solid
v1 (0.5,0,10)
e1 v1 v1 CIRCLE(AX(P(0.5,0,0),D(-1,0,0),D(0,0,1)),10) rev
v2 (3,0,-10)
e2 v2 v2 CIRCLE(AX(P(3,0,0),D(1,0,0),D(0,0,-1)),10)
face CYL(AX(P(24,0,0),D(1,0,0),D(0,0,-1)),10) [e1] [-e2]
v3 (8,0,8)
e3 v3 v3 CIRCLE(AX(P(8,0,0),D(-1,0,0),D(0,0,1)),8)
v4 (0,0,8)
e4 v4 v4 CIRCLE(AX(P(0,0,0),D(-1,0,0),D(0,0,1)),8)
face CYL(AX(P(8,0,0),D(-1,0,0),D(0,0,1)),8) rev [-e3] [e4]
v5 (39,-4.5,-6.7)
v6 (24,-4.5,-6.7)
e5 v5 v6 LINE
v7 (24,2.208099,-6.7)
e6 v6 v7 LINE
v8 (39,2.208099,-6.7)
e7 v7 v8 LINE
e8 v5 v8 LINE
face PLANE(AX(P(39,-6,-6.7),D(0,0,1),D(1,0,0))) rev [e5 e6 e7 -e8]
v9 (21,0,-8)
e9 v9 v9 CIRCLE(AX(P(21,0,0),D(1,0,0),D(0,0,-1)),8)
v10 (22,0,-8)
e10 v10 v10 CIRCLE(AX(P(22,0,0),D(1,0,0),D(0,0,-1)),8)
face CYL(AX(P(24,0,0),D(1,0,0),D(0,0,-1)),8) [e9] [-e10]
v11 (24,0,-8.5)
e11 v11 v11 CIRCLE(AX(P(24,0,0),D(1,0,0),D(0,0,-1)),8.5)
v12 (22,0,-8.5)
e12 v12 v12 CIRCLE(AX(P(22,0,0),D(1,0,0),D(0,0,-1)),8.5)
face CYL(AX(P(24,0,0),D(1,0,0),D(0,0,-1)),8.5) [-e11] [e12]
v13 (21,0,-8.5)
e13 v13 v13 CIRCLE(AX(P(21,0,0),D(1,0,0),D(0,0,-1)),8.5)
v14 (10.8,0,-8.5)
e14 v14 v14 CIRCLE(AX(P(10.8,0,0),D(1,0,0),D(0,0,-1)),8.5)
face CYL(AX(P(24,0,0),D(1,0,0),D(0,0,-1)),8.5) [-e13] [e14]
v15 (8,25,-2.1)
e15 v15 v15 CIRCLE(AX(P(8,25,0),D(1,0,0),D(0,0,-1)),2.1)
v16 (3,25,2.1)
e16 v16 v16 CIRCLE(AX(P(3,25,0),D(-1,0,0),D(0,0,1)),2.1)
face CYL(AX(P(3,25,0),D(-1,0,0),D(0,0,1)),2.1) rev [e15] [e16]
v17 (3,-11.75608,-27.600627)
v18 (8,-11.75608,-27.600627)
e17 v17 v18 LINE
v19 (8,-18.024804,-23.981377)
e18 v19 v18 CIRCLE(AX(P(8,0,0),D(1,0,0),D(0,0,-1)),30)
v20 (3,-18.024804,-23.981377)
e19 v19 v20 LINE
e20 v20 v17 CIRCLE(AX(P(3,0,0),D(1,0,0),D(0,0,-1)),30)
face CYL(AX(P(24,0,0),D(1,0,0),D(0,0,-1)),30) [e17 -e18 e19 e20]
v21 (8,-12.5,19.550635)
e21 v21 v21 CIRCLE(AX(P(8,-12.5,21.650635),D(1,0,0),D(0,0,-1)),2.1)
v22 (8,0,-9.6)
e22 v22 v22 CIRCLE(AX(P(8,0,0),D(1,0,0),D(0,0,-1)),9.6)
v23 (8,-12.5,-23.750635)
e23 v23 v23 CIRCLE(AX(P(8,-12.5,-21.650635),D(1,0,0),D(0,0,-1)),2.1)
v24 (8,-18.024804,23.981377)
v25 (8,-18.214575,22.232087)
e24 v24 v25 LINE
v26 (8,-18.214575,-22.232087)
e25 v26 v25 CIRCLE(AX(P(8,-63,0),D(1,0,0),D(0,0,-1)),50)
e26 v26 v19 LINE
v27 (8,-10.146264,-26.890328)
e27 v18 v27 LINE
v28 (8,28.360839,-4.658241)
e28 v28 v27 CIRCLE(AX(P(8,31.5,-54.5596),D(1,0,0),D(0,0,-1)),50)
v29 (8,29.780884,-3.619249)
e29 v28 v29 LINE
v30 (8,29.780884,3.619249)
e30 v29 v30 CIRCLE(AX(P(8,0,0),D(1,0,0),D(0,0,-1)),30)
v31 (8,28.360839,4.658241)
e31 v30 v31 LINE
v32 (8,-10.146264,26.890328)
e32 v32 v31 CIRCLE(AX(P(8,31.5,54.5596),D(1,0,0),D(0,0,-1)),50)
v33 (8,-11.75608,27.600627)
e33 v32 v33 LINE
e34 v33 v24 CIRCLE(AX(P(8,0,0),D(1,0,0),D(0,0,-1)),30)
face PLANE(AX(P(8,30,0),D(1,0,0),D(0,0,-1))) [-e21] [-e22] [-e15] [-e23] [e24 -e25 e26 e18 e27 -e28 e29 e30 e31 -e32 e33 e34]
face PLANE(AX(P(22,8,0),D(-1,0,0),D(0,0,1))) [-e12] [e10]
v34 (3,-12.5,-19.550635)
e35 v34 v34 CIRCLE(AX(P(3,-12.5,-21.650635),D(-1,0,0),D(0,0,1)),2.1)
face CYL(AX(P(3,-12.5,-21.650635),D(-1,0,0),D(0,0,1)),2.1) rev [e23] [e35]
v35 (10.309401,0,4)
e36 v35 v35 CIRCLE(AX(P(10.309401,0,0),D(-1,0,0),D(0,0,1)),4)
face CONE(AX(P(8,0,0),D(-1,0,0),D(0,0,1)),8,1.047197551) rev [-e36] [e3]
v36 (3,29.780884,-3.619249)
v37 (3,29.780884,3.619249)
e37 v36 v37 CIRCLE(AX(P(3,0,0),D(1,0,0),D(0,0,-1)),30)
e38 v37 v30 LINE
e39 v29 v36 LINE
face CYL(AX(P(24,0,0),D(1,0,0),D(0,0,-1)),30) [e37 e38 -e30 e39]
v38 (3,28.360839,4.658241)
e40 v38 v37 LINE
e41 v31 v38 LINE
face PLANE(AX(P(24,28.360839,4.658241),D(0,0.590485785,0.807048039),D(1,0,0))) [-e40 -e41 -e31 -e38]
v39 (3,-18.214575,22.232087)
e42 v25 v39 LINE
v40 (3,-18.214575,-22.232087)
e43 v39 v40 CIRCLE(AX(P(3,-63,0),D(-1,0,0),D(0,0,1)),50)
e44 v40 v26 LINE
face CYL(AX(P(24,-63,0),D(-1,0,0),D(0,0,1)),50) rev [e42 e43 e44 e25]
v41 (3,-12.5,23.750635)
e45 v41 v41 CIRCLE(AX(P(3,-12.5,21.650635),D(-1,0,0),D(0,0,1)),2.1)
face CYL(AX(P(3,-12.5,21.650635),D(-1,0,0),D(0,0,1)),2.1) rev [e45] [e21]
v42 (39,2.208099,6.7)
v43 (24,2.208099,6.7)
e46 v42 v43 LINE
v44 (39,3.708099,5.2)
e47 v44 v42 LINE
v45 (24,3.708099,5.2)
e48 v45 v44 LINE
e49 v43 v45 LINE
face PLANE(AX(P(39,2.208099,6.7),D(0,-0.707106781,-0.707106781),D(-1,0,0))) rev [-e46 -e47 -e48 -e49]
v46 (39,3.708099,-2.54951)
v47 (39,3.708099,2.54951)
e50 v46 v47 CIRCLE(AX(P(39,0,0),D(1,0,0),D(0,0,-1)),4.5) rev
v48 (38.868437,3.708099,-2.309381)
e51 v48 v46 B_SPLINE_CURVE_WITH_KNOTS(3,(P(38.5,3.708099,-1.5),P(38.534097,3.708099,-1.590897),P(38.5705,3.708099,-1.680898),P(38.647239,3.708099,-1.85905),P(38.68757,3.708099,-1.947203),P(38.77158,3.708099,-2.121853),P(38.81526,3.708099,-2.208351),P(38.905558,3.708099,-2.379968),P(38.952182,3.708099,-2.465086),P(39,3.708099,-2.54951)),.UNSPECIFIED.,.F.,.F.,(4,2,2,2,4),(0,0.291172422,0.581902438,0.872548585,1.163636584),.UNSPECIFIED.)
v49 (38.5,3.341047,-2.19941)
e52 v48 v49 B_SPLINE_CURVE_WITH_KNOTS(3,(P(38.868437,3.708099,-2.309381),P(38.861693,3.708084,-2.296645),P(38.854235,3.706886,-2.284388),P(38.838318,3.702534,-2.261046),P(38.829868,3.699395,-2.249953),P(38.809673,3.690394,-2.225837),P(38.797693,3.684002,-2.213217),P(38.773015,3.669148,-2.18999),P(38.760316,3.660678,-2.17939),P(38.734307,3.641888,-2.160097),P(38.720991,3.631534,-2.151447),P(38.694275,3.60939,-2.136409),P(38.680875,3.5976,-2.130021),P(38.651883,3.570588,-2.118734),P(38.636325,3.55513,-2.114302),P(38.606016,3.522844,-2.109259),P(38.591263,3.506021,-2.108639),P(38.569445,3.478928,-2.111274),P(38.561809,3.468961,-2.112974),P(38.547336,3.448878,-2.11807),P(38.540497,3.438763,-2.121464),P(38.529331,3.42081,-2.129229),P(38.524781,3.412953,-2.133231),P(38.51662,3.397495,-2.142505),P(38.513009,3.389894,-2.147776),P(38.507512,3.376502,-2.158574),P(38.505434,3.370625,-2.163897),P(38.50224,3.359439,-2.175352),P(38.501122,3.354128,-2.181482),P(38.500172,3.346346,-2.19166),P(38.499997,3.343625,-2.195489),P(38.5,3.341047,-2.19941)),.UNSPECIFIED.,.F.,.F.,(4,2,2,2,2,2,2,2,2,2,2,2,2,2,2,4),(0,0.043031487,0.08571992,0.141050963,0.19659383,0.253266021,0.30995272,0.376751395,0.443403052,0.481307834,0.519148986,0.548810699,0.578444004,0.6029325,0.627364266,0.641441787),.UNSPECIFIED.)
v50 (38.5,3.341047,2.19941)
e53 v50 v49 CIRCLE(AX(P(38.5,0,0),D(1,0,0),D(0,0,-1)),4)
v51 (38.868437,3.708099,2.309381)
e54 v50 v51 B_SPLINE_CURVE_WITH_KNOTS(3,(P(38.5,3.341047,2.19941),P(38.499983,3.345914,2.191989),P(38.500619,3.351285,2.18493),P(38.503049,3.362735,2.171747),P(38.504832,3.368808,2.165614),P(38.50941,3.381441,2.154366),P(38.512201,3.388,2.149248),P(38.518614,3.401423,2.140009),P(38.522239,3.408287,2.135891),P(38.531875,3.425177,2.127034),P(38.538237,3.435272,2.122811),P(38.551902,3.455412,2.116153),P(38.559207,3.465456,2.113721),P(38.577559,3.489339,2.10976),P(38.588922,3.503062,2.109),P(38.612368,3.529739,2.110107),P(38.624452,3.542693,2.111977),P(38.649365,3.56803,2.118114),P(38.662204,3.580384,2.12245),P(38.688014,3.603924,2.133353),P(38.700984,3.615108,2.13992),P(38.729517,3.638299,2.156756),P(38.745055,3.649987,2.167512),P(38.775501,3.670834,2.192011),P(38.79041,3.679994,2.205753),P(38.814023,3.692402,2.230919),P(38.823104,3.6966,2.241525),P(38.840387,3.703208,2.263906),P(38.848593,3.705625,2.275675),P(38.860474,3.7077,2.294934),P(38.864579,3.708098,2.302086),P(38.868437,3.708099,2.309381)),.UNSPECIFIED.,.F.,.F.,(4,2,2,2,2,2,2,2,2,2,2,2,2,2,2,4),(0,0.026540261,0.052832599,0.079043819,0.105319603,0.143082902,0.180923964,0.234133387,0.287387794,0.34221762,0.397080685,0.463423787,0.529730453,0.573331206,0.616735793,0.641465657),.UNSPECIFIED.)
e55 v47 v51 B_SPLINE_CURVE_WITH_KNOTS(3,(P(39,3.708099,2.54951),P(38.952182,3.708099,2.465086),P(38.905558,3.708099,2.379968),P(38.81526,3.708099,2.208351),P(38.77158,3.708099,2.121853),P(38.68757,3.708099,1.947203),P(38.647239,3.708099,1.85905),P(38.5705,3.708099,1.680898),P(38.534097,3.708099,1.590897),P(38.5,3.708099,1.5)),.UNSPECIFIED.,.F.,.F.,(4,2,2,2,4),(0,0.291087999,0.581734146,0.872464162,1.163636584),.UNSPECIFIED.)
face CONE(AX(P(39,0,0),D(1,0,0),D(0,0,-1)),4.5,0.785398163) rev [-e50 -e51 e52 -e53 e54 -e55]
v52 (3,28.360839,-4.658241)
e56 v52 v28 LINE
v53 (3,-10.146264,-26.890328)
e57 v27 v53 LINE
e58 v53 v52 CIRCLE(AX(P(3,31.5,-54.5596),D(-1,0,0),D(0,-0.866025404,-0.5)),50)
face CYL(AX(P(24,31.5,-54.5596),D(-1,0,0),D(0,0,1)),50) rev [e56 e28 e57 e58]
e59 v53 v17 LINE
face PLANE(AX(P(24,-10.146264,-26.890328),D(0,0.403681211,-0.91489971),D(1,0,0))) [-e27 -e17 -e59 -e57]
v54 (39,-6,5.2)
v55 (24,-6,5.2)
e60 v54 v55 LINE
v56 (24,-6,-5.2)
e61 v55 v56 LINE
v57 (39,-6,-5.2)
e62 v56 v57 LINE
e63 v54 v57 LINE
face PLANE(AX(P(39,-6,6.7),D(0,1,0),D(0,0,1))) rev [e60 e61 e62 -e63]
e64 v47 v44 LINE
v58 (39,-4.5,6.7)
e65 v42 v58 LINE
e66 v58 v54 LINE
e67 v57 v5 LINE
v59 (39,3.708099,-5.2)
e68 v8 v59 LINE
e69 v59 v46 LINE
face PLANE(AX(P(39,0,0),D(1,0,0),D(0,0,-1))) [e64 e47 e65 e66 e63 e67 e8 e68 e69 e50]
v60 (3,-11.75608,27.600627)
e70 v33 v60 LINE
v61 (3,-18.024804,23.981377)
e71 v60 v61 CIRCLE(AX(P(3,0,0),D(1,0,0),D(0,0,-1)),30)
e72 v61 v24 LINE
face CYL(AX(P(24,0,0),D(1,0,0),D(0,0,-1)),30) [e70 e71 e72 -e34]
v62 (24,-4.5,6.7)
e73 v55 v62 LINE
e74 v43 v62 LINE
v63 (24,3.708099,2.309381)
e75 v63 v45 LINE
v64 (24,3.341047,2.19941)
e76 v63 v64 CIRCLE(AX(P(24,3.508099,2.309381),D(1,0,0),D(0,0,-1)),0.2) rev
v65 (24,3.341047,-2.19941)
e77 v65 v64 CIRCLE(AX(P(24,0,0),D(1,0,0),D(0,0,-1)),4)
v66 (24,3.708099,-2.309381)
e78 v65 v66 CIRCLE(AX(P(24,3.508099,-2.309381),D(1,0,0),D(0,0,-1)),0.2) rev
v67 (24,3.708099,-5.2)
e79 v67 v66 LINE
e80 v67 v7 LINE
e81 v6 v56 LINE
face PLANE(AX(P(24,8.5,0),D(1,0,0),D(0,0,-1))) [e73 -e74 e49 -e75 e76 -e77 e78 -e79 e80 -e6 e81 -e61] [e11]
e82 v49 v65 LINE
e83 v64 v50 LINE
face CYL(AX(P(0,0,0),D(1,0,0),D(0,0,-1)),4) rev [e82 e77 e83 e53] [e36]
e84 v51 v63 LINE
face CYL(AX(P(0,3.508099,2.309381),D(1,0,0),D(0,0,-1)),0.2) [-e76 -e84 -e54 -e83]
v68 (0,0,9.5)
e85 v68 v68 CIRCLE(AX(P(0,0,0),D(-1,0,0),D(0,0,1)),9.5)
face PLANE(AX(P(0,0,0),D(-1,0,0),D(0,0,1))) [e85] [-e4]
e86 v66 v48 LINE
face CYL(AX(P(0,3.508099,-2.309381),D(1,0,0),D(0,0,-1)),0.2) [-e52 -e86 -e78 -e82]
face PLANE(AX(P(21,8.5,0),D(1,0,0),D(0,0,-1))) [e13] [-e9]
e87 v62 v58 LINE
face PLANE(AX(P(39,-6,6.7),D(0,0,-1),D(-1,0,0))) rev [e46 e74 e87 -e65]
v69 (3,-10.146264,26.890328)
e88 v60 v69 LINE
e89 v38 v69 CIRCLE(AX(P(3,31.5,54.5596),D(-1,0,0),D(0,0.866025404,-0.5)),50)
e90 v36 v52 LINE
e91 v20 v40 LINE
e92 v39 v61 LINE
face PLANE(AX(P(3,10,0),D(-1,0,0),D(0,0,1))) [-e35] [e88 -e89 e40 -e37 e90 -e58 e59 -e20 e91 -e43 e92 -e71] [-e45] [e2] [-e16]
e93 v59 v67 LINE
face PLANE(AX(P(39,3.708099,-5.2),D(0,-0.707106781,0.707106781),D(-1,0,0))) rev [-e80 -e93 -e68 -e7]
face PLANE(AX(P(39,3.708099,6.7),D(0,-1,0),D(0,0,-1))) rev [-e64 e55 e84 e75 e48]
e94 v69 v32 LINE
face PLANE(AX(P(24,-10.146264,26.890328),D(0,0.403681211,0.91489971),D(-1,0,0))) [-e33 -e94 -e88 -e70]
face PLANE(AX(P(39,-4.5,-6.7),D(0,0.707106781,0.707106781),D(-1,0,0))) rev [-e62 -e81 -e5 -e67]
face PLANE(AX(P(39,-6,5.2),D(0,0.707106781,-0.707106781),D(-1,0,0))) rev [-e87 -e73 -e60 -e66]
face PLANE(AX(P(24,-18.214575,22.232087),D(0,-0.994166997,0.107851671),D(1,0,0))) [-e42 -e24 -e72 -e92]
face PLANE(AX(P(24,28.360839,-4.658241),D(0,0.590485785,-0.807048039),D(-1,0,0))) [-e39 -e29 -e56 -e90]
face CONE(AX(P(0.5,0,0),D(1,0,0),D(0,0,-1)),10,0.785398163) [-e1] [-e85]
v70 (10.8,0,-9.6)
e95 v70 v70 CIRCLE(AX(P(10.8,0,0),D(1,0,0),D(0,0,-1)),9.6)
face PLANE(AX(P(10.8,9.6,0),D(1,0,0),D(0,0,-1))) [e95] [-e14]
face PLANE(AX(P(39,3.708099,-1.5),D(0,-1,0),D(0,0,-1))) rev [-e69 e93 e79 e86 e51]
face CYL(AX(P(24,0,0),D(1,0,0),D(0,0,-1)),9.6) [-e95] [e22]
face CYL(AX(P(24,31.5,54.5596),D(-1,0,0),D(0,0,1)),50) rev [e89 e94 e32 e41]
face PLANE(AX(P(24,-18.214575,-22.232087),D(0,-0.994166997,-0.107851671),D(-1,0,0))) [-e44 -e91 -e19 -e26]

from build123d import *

# Parameters (mm, degrees)
SKETCH_2_R               = 4
CUT_EXTRUDE_1_DEPTH      = 49.744230428
CUT_EXTRUDE_START        = -8
SKETCH_3_R               = 8
CUT_EXTRUDE_2_DEPTH      = 8
CHAMFER_1_SIZE2          = 2.309401077
CHAMFER_1_SIZE           = 4
HOLE_WIZARD_M5_1_D       = 4.2
CUT_EXTRUDE_3_DEPTH      = 48.339201514
PATTERN_CIRCULAR_1_COUNT = 3
CHAMFER_4_SIZE           = 0.5
EXTRUDE_START            = 15
EXTRUDE_1_DEPTH          = 15
CHAMFER_5_SIZE           = 1.5
CHAMFER_6_SIZE           = 0.5
FILLET_1_R               = 0.2


# Some blends are built 0.0001 mm under size
with BuildPart() as part:
    # 草图1 → 旋转1 (revolve)
    with BuildSketch(Plane.XY, mode=Mode.PRIVATE) as revolve_1_sk:
        Polygon((0, 0), (0, 10), (3, 10), (3, 30), (8, 30), (8, 9.6), (10.8, 9.6), (10.8, 8.5), (21, 8.5), (21, 8), (22, 8), (22, 8.5), (24, 8.5), (24, 0), align=None)
    revolve(revolve_1_sk.sketch.rotate(Axis((24, 0, 0), (-1, 0, 0)), 90), axis=Axis((24, 0, 0), (-1, 0, 0)))

    # 草图2 → 切除-拉伸1 (cut, through all)
    with BuildSketch(Plane(origin=(24, 0, 0), x_dir=(0, 0, -1), z_dir=(1, 0, 0))):
        Circle(SKETCH_2_R)
    extrude(amount=-CUT_EXTRUDE_1_DEPTH, mode=Mode.SUBTRACT)

    # 草图3 → 切除-拉伸2 (cut)
    with BuildSketch(Plane.ZY.offset(CUT_EXTRUDE_START)):
        with Locations(Location((0, 0, 0), (0, 0, 180))):
            Circle(SKETCH_3_R)
    extrude(amount=CUT_EXTRUDE_2_DEPTH, mode=Mode.SUBTRACT)

    # 倒角1
    chamfer_1_edges = [part.edges().sort_by_distance(p)[0] for p in [
        (8, 0, 4),
    ]]
    chamfer_1_side = [part.faces().sort_by_distance(p)[0] for p in [
        (8, 0, 4.046188022),
    ]]
    chamfer(chamfer_1_edges, length=CHAMFER_1_SIZE - 0.0001, length2=CHAMFER_1_SIZE2 - 0.0001, reference=chamfer_1_side[0])  # a hair under: the kernel refuses the full size

    # M5 螺纹孔1 (through all)
    with Locations(Plane(origin=(3, 25, 0), x_dir=(0, 0, -1), z_dir=(-1, 0, 0))):
        with Locations((0, 0), (-21.650635095, 37.5), (21.650635095, 37.5)):
            Hole(HOLE_WIZARD_M5_1_D / 2)

    # 草图4 → 切除-拉伸3 (cut, through all)
    with BuildSketch(Plane.ZY.offset(-3)):
        with BuildLine():
            ThreePointArc((-27.710194429, -21.380952381), (0, -35), (27.710194429, -21.380952381))
            ThreePointArc((27.710194429, -21.380952381), (0, -13), (-27.710194429, -21.380952381))
        make_face()
    cut_extrude_3 = extrude(amount=-CUT_EXTRUDE_3_DEPTH, mode=Mode.SUBTRACT)

    # 阵列(圆周)1: 切除-拉伸3 ×3 about axis
    pattern_circular_1_axis = Axis((0, 0, 0), (1, 0, 0))
    for i in range(1, PATTERN_CIRCULAR_1_COUNT):
        add(cut_extrude_3.rotate(pattern_circular_1_axis, i * 360 / PATTERN_CIRCULAR_1_COUNT), mode=Mode.SUBTRACT)

    # 倒角2
    # the kernel refuses this chamfer: 1.262336382, 1 mm, written as the material it takes off along each edge
    with BuildSketch(Plane(origin=(-0.323534522, -18.801587302, -23.377346191), x_dir=(0, 0.7894182220381707, -0.6138557409637001), z_dir=(1, 0, 0)), Plane(origin=(-0.323534522, -10.844582024, 27.97132533), x_dir=(0, -0.9263237769525716, -0.3767283640135453), z_dir=(1, 0, 0)), Plane(origin=(-0.323534522, 29.646169325, -4.593979139), x_dir=(0, 0.13690555491440626, 0.9905841049772496), z_dir=(1, 0, 0))) as chamfer_2_piece_1:
        with BuildLine():
            Line((0.983994902, 0), (-0.239625676, 1.264429883))
            ThreePointArc((-0.239625676, 1.264429883), (-0.119678092, 0.653717986), (0, 0))
            ThreePointArc((0, 0), (0.509546154, -0.004029497), (0.983994902, 0))
        make_face()
    extrude(amount=11.647069044, mode=Mode.SUBTRACT)
    with BuildSketch(Plane(origin=(-0.323534522, -10.844582024, -27.97132533), x_dir=(0, 0.5426204152715339, 0.8399780264569711), z_dir=(1, 0, 0)), Plane(origin=(-0.323534522, 29.646169325, 4.593979139), x_dir=(0, -0.9987525171682211, 0.04993405100872917), z_dir=(1, 0, 0))) as chamfer_2_piece_2:
        with BuildLine():
            Line((1.28693566, 0), (-0.183218517, 0.966786917))
            ThreePointArc((-0.183218517, 0.966786917), (-0.098835833, 0.499884984), (0, 0))
            ThreePointArc((0, 0), (0.664569743, 0.004136227), (1.28693566, 0))
        make_face()
    extrude(amount=11.647069044, mode=Mode.SUBTRACT)
    with BuildSketch(Plane(origin=(-0.323534522, -18.801587302, 23.377346191), x_dir=(0, 0.7894182220381672, 0.6138557409637047), z_dir=(1, 0, 0))) as chamfer_2_piece_3:
        with BuildLine():
            Line((0.983994902, 0), (-0.239625676, -1.264429883))
            ThreePointArc((-0.239625676, -1.264429883), (-0.119678092, -0.653717986), (0, 0))
            ThreePointArc((0, 0), (0.509546154, 0.004029497), (0.983994902, 0))
        make_face()
    extrude(amount=11.647069044, mode=Mode.SUBTRACT)

    # 倒角4
    chamfer_4_edges = [part.edges().sort_by_distance(p)[0] for p in [
        (0, 0, 10),
    ]]
    chamfer(chamfer_4_edges, length=CHAMFER_4_SIZE)

    # 草图7 → 凸台-拉伸1 (add)
    with BuildSketch(Plane(origin=(24, 0, 0), x_dir=(0, 0, -1), z_dir=(1, 0, 0)).offset(EXTRUDE_START)):
        with BuildLine():
            Line((-6.7, -6), (6.7, -6))
            Line((6.7, -6), (6.7, 3.708099244))
            Line((6.7, 3.708099244), (1.5, 3.708099244))
            ThreePointArc((1.5, 3.708099244), (0, -4), (-1.5, 3.708099244))
            Line((-1.5, 3.708099244), (-6.7, 3.708099244))
            Line((-6.7, 3.708099244), (-6.7, -6))
        make_face()
    extrude(amount=-EXTRUDE_1_DEPTH)

    # 倒角5
    # the kernel refuses this chamfer: 1.5 mm, written as the material it takes off along each edge
    with BuildSketch(Plane(origin=(42.857524482, 3.708099244, 6.7), x_dir=(0, 0, -1), z_dir=(-1, 0, 0)), Plane(origin=(42.857524482, -6, 6.7), x_dir=(0, 1, 0), z_dir=(-1, 0, 0))) as chamfer_5_piece_1:
        Polygon((CHAMFER_5_SIZE, 0), (0, CHAMFER_5_SIZE), (0, 0), align=None)
    extrude(amount=18.857524482, mode=Mode.SUBTRACT)
    with BuildSketch(Plane(origin=(42.857524482, -6, -6.7), x_dir=(0, 1, 0), z_dir=(-1, 0, 0)), Plane(origin=(42.857524482, 3.708099244, -6.7), x_dir=(0, 0, 1), z_dir=(-1, 0, 0))) as chamfer_5_piece_2:
        Polygon((CHAMFER_5_SIZE, 0), (0, -CHAMFER_5_SIZE), (0, 0), align=None)
    extrude(amount=18.857524482, mode=Mode.SUBTRACT)

    # 倒角6
    chamfer_6_edges = [part.edges().sort_by_distance(p)[0] for p in [
        (39, -4, 0),
    ]]
    chamfer(chamfer_6_edges, length=CHAMFER_6_SIZE)

    # 圆角1
    # the kernel refuses this fillet: 0.2 mm, written as the material it takes off along each edge
    with BuildSketch(Plane(origin=(40.52345201, 3.708099244, 1.5), x_dir=(0, -0.464696875551773, 0.8854698266188521), z_dir=(-1, 0, 0))) as fillet_1_piece_1:
        with BuildLine():
            CenterArc((0.809621655, 0.199022765), FILLET_1_R, 117.690606121, 146.643100594)
            Line((0.71668228, 0.376116731), (0, 0))
            ThreePointArc((0, 0), (0.394937393, 0.019544692), (0.789874786, 0))
        make_face()
    extrude(amount=16.52345201, mode=Mode.SUBTRACT)
    with BuildSketch(Plane(origin=(40.52345201, 3.708099244, -1.5), x_dir=(0, -0.46469687555177314, -0.885469826618852), z_dir=(-1, 0, 0))) as fillet_1_piece_2:
        with BuildLine():
            CenterArc((0.809621655, -0.199022765), FILLET_1_R, 95.666293284, 146.643100594)
            Line((0.71668228, -0.376116731), (0, 0))
            ThreePointArc((0, 0), (0.394937393, -0.019544692), (0.789874786, 0))
        make_face()
    extrude(amount=16.52345201, mode=Mode.SUBTRACT)


solid = part.part
